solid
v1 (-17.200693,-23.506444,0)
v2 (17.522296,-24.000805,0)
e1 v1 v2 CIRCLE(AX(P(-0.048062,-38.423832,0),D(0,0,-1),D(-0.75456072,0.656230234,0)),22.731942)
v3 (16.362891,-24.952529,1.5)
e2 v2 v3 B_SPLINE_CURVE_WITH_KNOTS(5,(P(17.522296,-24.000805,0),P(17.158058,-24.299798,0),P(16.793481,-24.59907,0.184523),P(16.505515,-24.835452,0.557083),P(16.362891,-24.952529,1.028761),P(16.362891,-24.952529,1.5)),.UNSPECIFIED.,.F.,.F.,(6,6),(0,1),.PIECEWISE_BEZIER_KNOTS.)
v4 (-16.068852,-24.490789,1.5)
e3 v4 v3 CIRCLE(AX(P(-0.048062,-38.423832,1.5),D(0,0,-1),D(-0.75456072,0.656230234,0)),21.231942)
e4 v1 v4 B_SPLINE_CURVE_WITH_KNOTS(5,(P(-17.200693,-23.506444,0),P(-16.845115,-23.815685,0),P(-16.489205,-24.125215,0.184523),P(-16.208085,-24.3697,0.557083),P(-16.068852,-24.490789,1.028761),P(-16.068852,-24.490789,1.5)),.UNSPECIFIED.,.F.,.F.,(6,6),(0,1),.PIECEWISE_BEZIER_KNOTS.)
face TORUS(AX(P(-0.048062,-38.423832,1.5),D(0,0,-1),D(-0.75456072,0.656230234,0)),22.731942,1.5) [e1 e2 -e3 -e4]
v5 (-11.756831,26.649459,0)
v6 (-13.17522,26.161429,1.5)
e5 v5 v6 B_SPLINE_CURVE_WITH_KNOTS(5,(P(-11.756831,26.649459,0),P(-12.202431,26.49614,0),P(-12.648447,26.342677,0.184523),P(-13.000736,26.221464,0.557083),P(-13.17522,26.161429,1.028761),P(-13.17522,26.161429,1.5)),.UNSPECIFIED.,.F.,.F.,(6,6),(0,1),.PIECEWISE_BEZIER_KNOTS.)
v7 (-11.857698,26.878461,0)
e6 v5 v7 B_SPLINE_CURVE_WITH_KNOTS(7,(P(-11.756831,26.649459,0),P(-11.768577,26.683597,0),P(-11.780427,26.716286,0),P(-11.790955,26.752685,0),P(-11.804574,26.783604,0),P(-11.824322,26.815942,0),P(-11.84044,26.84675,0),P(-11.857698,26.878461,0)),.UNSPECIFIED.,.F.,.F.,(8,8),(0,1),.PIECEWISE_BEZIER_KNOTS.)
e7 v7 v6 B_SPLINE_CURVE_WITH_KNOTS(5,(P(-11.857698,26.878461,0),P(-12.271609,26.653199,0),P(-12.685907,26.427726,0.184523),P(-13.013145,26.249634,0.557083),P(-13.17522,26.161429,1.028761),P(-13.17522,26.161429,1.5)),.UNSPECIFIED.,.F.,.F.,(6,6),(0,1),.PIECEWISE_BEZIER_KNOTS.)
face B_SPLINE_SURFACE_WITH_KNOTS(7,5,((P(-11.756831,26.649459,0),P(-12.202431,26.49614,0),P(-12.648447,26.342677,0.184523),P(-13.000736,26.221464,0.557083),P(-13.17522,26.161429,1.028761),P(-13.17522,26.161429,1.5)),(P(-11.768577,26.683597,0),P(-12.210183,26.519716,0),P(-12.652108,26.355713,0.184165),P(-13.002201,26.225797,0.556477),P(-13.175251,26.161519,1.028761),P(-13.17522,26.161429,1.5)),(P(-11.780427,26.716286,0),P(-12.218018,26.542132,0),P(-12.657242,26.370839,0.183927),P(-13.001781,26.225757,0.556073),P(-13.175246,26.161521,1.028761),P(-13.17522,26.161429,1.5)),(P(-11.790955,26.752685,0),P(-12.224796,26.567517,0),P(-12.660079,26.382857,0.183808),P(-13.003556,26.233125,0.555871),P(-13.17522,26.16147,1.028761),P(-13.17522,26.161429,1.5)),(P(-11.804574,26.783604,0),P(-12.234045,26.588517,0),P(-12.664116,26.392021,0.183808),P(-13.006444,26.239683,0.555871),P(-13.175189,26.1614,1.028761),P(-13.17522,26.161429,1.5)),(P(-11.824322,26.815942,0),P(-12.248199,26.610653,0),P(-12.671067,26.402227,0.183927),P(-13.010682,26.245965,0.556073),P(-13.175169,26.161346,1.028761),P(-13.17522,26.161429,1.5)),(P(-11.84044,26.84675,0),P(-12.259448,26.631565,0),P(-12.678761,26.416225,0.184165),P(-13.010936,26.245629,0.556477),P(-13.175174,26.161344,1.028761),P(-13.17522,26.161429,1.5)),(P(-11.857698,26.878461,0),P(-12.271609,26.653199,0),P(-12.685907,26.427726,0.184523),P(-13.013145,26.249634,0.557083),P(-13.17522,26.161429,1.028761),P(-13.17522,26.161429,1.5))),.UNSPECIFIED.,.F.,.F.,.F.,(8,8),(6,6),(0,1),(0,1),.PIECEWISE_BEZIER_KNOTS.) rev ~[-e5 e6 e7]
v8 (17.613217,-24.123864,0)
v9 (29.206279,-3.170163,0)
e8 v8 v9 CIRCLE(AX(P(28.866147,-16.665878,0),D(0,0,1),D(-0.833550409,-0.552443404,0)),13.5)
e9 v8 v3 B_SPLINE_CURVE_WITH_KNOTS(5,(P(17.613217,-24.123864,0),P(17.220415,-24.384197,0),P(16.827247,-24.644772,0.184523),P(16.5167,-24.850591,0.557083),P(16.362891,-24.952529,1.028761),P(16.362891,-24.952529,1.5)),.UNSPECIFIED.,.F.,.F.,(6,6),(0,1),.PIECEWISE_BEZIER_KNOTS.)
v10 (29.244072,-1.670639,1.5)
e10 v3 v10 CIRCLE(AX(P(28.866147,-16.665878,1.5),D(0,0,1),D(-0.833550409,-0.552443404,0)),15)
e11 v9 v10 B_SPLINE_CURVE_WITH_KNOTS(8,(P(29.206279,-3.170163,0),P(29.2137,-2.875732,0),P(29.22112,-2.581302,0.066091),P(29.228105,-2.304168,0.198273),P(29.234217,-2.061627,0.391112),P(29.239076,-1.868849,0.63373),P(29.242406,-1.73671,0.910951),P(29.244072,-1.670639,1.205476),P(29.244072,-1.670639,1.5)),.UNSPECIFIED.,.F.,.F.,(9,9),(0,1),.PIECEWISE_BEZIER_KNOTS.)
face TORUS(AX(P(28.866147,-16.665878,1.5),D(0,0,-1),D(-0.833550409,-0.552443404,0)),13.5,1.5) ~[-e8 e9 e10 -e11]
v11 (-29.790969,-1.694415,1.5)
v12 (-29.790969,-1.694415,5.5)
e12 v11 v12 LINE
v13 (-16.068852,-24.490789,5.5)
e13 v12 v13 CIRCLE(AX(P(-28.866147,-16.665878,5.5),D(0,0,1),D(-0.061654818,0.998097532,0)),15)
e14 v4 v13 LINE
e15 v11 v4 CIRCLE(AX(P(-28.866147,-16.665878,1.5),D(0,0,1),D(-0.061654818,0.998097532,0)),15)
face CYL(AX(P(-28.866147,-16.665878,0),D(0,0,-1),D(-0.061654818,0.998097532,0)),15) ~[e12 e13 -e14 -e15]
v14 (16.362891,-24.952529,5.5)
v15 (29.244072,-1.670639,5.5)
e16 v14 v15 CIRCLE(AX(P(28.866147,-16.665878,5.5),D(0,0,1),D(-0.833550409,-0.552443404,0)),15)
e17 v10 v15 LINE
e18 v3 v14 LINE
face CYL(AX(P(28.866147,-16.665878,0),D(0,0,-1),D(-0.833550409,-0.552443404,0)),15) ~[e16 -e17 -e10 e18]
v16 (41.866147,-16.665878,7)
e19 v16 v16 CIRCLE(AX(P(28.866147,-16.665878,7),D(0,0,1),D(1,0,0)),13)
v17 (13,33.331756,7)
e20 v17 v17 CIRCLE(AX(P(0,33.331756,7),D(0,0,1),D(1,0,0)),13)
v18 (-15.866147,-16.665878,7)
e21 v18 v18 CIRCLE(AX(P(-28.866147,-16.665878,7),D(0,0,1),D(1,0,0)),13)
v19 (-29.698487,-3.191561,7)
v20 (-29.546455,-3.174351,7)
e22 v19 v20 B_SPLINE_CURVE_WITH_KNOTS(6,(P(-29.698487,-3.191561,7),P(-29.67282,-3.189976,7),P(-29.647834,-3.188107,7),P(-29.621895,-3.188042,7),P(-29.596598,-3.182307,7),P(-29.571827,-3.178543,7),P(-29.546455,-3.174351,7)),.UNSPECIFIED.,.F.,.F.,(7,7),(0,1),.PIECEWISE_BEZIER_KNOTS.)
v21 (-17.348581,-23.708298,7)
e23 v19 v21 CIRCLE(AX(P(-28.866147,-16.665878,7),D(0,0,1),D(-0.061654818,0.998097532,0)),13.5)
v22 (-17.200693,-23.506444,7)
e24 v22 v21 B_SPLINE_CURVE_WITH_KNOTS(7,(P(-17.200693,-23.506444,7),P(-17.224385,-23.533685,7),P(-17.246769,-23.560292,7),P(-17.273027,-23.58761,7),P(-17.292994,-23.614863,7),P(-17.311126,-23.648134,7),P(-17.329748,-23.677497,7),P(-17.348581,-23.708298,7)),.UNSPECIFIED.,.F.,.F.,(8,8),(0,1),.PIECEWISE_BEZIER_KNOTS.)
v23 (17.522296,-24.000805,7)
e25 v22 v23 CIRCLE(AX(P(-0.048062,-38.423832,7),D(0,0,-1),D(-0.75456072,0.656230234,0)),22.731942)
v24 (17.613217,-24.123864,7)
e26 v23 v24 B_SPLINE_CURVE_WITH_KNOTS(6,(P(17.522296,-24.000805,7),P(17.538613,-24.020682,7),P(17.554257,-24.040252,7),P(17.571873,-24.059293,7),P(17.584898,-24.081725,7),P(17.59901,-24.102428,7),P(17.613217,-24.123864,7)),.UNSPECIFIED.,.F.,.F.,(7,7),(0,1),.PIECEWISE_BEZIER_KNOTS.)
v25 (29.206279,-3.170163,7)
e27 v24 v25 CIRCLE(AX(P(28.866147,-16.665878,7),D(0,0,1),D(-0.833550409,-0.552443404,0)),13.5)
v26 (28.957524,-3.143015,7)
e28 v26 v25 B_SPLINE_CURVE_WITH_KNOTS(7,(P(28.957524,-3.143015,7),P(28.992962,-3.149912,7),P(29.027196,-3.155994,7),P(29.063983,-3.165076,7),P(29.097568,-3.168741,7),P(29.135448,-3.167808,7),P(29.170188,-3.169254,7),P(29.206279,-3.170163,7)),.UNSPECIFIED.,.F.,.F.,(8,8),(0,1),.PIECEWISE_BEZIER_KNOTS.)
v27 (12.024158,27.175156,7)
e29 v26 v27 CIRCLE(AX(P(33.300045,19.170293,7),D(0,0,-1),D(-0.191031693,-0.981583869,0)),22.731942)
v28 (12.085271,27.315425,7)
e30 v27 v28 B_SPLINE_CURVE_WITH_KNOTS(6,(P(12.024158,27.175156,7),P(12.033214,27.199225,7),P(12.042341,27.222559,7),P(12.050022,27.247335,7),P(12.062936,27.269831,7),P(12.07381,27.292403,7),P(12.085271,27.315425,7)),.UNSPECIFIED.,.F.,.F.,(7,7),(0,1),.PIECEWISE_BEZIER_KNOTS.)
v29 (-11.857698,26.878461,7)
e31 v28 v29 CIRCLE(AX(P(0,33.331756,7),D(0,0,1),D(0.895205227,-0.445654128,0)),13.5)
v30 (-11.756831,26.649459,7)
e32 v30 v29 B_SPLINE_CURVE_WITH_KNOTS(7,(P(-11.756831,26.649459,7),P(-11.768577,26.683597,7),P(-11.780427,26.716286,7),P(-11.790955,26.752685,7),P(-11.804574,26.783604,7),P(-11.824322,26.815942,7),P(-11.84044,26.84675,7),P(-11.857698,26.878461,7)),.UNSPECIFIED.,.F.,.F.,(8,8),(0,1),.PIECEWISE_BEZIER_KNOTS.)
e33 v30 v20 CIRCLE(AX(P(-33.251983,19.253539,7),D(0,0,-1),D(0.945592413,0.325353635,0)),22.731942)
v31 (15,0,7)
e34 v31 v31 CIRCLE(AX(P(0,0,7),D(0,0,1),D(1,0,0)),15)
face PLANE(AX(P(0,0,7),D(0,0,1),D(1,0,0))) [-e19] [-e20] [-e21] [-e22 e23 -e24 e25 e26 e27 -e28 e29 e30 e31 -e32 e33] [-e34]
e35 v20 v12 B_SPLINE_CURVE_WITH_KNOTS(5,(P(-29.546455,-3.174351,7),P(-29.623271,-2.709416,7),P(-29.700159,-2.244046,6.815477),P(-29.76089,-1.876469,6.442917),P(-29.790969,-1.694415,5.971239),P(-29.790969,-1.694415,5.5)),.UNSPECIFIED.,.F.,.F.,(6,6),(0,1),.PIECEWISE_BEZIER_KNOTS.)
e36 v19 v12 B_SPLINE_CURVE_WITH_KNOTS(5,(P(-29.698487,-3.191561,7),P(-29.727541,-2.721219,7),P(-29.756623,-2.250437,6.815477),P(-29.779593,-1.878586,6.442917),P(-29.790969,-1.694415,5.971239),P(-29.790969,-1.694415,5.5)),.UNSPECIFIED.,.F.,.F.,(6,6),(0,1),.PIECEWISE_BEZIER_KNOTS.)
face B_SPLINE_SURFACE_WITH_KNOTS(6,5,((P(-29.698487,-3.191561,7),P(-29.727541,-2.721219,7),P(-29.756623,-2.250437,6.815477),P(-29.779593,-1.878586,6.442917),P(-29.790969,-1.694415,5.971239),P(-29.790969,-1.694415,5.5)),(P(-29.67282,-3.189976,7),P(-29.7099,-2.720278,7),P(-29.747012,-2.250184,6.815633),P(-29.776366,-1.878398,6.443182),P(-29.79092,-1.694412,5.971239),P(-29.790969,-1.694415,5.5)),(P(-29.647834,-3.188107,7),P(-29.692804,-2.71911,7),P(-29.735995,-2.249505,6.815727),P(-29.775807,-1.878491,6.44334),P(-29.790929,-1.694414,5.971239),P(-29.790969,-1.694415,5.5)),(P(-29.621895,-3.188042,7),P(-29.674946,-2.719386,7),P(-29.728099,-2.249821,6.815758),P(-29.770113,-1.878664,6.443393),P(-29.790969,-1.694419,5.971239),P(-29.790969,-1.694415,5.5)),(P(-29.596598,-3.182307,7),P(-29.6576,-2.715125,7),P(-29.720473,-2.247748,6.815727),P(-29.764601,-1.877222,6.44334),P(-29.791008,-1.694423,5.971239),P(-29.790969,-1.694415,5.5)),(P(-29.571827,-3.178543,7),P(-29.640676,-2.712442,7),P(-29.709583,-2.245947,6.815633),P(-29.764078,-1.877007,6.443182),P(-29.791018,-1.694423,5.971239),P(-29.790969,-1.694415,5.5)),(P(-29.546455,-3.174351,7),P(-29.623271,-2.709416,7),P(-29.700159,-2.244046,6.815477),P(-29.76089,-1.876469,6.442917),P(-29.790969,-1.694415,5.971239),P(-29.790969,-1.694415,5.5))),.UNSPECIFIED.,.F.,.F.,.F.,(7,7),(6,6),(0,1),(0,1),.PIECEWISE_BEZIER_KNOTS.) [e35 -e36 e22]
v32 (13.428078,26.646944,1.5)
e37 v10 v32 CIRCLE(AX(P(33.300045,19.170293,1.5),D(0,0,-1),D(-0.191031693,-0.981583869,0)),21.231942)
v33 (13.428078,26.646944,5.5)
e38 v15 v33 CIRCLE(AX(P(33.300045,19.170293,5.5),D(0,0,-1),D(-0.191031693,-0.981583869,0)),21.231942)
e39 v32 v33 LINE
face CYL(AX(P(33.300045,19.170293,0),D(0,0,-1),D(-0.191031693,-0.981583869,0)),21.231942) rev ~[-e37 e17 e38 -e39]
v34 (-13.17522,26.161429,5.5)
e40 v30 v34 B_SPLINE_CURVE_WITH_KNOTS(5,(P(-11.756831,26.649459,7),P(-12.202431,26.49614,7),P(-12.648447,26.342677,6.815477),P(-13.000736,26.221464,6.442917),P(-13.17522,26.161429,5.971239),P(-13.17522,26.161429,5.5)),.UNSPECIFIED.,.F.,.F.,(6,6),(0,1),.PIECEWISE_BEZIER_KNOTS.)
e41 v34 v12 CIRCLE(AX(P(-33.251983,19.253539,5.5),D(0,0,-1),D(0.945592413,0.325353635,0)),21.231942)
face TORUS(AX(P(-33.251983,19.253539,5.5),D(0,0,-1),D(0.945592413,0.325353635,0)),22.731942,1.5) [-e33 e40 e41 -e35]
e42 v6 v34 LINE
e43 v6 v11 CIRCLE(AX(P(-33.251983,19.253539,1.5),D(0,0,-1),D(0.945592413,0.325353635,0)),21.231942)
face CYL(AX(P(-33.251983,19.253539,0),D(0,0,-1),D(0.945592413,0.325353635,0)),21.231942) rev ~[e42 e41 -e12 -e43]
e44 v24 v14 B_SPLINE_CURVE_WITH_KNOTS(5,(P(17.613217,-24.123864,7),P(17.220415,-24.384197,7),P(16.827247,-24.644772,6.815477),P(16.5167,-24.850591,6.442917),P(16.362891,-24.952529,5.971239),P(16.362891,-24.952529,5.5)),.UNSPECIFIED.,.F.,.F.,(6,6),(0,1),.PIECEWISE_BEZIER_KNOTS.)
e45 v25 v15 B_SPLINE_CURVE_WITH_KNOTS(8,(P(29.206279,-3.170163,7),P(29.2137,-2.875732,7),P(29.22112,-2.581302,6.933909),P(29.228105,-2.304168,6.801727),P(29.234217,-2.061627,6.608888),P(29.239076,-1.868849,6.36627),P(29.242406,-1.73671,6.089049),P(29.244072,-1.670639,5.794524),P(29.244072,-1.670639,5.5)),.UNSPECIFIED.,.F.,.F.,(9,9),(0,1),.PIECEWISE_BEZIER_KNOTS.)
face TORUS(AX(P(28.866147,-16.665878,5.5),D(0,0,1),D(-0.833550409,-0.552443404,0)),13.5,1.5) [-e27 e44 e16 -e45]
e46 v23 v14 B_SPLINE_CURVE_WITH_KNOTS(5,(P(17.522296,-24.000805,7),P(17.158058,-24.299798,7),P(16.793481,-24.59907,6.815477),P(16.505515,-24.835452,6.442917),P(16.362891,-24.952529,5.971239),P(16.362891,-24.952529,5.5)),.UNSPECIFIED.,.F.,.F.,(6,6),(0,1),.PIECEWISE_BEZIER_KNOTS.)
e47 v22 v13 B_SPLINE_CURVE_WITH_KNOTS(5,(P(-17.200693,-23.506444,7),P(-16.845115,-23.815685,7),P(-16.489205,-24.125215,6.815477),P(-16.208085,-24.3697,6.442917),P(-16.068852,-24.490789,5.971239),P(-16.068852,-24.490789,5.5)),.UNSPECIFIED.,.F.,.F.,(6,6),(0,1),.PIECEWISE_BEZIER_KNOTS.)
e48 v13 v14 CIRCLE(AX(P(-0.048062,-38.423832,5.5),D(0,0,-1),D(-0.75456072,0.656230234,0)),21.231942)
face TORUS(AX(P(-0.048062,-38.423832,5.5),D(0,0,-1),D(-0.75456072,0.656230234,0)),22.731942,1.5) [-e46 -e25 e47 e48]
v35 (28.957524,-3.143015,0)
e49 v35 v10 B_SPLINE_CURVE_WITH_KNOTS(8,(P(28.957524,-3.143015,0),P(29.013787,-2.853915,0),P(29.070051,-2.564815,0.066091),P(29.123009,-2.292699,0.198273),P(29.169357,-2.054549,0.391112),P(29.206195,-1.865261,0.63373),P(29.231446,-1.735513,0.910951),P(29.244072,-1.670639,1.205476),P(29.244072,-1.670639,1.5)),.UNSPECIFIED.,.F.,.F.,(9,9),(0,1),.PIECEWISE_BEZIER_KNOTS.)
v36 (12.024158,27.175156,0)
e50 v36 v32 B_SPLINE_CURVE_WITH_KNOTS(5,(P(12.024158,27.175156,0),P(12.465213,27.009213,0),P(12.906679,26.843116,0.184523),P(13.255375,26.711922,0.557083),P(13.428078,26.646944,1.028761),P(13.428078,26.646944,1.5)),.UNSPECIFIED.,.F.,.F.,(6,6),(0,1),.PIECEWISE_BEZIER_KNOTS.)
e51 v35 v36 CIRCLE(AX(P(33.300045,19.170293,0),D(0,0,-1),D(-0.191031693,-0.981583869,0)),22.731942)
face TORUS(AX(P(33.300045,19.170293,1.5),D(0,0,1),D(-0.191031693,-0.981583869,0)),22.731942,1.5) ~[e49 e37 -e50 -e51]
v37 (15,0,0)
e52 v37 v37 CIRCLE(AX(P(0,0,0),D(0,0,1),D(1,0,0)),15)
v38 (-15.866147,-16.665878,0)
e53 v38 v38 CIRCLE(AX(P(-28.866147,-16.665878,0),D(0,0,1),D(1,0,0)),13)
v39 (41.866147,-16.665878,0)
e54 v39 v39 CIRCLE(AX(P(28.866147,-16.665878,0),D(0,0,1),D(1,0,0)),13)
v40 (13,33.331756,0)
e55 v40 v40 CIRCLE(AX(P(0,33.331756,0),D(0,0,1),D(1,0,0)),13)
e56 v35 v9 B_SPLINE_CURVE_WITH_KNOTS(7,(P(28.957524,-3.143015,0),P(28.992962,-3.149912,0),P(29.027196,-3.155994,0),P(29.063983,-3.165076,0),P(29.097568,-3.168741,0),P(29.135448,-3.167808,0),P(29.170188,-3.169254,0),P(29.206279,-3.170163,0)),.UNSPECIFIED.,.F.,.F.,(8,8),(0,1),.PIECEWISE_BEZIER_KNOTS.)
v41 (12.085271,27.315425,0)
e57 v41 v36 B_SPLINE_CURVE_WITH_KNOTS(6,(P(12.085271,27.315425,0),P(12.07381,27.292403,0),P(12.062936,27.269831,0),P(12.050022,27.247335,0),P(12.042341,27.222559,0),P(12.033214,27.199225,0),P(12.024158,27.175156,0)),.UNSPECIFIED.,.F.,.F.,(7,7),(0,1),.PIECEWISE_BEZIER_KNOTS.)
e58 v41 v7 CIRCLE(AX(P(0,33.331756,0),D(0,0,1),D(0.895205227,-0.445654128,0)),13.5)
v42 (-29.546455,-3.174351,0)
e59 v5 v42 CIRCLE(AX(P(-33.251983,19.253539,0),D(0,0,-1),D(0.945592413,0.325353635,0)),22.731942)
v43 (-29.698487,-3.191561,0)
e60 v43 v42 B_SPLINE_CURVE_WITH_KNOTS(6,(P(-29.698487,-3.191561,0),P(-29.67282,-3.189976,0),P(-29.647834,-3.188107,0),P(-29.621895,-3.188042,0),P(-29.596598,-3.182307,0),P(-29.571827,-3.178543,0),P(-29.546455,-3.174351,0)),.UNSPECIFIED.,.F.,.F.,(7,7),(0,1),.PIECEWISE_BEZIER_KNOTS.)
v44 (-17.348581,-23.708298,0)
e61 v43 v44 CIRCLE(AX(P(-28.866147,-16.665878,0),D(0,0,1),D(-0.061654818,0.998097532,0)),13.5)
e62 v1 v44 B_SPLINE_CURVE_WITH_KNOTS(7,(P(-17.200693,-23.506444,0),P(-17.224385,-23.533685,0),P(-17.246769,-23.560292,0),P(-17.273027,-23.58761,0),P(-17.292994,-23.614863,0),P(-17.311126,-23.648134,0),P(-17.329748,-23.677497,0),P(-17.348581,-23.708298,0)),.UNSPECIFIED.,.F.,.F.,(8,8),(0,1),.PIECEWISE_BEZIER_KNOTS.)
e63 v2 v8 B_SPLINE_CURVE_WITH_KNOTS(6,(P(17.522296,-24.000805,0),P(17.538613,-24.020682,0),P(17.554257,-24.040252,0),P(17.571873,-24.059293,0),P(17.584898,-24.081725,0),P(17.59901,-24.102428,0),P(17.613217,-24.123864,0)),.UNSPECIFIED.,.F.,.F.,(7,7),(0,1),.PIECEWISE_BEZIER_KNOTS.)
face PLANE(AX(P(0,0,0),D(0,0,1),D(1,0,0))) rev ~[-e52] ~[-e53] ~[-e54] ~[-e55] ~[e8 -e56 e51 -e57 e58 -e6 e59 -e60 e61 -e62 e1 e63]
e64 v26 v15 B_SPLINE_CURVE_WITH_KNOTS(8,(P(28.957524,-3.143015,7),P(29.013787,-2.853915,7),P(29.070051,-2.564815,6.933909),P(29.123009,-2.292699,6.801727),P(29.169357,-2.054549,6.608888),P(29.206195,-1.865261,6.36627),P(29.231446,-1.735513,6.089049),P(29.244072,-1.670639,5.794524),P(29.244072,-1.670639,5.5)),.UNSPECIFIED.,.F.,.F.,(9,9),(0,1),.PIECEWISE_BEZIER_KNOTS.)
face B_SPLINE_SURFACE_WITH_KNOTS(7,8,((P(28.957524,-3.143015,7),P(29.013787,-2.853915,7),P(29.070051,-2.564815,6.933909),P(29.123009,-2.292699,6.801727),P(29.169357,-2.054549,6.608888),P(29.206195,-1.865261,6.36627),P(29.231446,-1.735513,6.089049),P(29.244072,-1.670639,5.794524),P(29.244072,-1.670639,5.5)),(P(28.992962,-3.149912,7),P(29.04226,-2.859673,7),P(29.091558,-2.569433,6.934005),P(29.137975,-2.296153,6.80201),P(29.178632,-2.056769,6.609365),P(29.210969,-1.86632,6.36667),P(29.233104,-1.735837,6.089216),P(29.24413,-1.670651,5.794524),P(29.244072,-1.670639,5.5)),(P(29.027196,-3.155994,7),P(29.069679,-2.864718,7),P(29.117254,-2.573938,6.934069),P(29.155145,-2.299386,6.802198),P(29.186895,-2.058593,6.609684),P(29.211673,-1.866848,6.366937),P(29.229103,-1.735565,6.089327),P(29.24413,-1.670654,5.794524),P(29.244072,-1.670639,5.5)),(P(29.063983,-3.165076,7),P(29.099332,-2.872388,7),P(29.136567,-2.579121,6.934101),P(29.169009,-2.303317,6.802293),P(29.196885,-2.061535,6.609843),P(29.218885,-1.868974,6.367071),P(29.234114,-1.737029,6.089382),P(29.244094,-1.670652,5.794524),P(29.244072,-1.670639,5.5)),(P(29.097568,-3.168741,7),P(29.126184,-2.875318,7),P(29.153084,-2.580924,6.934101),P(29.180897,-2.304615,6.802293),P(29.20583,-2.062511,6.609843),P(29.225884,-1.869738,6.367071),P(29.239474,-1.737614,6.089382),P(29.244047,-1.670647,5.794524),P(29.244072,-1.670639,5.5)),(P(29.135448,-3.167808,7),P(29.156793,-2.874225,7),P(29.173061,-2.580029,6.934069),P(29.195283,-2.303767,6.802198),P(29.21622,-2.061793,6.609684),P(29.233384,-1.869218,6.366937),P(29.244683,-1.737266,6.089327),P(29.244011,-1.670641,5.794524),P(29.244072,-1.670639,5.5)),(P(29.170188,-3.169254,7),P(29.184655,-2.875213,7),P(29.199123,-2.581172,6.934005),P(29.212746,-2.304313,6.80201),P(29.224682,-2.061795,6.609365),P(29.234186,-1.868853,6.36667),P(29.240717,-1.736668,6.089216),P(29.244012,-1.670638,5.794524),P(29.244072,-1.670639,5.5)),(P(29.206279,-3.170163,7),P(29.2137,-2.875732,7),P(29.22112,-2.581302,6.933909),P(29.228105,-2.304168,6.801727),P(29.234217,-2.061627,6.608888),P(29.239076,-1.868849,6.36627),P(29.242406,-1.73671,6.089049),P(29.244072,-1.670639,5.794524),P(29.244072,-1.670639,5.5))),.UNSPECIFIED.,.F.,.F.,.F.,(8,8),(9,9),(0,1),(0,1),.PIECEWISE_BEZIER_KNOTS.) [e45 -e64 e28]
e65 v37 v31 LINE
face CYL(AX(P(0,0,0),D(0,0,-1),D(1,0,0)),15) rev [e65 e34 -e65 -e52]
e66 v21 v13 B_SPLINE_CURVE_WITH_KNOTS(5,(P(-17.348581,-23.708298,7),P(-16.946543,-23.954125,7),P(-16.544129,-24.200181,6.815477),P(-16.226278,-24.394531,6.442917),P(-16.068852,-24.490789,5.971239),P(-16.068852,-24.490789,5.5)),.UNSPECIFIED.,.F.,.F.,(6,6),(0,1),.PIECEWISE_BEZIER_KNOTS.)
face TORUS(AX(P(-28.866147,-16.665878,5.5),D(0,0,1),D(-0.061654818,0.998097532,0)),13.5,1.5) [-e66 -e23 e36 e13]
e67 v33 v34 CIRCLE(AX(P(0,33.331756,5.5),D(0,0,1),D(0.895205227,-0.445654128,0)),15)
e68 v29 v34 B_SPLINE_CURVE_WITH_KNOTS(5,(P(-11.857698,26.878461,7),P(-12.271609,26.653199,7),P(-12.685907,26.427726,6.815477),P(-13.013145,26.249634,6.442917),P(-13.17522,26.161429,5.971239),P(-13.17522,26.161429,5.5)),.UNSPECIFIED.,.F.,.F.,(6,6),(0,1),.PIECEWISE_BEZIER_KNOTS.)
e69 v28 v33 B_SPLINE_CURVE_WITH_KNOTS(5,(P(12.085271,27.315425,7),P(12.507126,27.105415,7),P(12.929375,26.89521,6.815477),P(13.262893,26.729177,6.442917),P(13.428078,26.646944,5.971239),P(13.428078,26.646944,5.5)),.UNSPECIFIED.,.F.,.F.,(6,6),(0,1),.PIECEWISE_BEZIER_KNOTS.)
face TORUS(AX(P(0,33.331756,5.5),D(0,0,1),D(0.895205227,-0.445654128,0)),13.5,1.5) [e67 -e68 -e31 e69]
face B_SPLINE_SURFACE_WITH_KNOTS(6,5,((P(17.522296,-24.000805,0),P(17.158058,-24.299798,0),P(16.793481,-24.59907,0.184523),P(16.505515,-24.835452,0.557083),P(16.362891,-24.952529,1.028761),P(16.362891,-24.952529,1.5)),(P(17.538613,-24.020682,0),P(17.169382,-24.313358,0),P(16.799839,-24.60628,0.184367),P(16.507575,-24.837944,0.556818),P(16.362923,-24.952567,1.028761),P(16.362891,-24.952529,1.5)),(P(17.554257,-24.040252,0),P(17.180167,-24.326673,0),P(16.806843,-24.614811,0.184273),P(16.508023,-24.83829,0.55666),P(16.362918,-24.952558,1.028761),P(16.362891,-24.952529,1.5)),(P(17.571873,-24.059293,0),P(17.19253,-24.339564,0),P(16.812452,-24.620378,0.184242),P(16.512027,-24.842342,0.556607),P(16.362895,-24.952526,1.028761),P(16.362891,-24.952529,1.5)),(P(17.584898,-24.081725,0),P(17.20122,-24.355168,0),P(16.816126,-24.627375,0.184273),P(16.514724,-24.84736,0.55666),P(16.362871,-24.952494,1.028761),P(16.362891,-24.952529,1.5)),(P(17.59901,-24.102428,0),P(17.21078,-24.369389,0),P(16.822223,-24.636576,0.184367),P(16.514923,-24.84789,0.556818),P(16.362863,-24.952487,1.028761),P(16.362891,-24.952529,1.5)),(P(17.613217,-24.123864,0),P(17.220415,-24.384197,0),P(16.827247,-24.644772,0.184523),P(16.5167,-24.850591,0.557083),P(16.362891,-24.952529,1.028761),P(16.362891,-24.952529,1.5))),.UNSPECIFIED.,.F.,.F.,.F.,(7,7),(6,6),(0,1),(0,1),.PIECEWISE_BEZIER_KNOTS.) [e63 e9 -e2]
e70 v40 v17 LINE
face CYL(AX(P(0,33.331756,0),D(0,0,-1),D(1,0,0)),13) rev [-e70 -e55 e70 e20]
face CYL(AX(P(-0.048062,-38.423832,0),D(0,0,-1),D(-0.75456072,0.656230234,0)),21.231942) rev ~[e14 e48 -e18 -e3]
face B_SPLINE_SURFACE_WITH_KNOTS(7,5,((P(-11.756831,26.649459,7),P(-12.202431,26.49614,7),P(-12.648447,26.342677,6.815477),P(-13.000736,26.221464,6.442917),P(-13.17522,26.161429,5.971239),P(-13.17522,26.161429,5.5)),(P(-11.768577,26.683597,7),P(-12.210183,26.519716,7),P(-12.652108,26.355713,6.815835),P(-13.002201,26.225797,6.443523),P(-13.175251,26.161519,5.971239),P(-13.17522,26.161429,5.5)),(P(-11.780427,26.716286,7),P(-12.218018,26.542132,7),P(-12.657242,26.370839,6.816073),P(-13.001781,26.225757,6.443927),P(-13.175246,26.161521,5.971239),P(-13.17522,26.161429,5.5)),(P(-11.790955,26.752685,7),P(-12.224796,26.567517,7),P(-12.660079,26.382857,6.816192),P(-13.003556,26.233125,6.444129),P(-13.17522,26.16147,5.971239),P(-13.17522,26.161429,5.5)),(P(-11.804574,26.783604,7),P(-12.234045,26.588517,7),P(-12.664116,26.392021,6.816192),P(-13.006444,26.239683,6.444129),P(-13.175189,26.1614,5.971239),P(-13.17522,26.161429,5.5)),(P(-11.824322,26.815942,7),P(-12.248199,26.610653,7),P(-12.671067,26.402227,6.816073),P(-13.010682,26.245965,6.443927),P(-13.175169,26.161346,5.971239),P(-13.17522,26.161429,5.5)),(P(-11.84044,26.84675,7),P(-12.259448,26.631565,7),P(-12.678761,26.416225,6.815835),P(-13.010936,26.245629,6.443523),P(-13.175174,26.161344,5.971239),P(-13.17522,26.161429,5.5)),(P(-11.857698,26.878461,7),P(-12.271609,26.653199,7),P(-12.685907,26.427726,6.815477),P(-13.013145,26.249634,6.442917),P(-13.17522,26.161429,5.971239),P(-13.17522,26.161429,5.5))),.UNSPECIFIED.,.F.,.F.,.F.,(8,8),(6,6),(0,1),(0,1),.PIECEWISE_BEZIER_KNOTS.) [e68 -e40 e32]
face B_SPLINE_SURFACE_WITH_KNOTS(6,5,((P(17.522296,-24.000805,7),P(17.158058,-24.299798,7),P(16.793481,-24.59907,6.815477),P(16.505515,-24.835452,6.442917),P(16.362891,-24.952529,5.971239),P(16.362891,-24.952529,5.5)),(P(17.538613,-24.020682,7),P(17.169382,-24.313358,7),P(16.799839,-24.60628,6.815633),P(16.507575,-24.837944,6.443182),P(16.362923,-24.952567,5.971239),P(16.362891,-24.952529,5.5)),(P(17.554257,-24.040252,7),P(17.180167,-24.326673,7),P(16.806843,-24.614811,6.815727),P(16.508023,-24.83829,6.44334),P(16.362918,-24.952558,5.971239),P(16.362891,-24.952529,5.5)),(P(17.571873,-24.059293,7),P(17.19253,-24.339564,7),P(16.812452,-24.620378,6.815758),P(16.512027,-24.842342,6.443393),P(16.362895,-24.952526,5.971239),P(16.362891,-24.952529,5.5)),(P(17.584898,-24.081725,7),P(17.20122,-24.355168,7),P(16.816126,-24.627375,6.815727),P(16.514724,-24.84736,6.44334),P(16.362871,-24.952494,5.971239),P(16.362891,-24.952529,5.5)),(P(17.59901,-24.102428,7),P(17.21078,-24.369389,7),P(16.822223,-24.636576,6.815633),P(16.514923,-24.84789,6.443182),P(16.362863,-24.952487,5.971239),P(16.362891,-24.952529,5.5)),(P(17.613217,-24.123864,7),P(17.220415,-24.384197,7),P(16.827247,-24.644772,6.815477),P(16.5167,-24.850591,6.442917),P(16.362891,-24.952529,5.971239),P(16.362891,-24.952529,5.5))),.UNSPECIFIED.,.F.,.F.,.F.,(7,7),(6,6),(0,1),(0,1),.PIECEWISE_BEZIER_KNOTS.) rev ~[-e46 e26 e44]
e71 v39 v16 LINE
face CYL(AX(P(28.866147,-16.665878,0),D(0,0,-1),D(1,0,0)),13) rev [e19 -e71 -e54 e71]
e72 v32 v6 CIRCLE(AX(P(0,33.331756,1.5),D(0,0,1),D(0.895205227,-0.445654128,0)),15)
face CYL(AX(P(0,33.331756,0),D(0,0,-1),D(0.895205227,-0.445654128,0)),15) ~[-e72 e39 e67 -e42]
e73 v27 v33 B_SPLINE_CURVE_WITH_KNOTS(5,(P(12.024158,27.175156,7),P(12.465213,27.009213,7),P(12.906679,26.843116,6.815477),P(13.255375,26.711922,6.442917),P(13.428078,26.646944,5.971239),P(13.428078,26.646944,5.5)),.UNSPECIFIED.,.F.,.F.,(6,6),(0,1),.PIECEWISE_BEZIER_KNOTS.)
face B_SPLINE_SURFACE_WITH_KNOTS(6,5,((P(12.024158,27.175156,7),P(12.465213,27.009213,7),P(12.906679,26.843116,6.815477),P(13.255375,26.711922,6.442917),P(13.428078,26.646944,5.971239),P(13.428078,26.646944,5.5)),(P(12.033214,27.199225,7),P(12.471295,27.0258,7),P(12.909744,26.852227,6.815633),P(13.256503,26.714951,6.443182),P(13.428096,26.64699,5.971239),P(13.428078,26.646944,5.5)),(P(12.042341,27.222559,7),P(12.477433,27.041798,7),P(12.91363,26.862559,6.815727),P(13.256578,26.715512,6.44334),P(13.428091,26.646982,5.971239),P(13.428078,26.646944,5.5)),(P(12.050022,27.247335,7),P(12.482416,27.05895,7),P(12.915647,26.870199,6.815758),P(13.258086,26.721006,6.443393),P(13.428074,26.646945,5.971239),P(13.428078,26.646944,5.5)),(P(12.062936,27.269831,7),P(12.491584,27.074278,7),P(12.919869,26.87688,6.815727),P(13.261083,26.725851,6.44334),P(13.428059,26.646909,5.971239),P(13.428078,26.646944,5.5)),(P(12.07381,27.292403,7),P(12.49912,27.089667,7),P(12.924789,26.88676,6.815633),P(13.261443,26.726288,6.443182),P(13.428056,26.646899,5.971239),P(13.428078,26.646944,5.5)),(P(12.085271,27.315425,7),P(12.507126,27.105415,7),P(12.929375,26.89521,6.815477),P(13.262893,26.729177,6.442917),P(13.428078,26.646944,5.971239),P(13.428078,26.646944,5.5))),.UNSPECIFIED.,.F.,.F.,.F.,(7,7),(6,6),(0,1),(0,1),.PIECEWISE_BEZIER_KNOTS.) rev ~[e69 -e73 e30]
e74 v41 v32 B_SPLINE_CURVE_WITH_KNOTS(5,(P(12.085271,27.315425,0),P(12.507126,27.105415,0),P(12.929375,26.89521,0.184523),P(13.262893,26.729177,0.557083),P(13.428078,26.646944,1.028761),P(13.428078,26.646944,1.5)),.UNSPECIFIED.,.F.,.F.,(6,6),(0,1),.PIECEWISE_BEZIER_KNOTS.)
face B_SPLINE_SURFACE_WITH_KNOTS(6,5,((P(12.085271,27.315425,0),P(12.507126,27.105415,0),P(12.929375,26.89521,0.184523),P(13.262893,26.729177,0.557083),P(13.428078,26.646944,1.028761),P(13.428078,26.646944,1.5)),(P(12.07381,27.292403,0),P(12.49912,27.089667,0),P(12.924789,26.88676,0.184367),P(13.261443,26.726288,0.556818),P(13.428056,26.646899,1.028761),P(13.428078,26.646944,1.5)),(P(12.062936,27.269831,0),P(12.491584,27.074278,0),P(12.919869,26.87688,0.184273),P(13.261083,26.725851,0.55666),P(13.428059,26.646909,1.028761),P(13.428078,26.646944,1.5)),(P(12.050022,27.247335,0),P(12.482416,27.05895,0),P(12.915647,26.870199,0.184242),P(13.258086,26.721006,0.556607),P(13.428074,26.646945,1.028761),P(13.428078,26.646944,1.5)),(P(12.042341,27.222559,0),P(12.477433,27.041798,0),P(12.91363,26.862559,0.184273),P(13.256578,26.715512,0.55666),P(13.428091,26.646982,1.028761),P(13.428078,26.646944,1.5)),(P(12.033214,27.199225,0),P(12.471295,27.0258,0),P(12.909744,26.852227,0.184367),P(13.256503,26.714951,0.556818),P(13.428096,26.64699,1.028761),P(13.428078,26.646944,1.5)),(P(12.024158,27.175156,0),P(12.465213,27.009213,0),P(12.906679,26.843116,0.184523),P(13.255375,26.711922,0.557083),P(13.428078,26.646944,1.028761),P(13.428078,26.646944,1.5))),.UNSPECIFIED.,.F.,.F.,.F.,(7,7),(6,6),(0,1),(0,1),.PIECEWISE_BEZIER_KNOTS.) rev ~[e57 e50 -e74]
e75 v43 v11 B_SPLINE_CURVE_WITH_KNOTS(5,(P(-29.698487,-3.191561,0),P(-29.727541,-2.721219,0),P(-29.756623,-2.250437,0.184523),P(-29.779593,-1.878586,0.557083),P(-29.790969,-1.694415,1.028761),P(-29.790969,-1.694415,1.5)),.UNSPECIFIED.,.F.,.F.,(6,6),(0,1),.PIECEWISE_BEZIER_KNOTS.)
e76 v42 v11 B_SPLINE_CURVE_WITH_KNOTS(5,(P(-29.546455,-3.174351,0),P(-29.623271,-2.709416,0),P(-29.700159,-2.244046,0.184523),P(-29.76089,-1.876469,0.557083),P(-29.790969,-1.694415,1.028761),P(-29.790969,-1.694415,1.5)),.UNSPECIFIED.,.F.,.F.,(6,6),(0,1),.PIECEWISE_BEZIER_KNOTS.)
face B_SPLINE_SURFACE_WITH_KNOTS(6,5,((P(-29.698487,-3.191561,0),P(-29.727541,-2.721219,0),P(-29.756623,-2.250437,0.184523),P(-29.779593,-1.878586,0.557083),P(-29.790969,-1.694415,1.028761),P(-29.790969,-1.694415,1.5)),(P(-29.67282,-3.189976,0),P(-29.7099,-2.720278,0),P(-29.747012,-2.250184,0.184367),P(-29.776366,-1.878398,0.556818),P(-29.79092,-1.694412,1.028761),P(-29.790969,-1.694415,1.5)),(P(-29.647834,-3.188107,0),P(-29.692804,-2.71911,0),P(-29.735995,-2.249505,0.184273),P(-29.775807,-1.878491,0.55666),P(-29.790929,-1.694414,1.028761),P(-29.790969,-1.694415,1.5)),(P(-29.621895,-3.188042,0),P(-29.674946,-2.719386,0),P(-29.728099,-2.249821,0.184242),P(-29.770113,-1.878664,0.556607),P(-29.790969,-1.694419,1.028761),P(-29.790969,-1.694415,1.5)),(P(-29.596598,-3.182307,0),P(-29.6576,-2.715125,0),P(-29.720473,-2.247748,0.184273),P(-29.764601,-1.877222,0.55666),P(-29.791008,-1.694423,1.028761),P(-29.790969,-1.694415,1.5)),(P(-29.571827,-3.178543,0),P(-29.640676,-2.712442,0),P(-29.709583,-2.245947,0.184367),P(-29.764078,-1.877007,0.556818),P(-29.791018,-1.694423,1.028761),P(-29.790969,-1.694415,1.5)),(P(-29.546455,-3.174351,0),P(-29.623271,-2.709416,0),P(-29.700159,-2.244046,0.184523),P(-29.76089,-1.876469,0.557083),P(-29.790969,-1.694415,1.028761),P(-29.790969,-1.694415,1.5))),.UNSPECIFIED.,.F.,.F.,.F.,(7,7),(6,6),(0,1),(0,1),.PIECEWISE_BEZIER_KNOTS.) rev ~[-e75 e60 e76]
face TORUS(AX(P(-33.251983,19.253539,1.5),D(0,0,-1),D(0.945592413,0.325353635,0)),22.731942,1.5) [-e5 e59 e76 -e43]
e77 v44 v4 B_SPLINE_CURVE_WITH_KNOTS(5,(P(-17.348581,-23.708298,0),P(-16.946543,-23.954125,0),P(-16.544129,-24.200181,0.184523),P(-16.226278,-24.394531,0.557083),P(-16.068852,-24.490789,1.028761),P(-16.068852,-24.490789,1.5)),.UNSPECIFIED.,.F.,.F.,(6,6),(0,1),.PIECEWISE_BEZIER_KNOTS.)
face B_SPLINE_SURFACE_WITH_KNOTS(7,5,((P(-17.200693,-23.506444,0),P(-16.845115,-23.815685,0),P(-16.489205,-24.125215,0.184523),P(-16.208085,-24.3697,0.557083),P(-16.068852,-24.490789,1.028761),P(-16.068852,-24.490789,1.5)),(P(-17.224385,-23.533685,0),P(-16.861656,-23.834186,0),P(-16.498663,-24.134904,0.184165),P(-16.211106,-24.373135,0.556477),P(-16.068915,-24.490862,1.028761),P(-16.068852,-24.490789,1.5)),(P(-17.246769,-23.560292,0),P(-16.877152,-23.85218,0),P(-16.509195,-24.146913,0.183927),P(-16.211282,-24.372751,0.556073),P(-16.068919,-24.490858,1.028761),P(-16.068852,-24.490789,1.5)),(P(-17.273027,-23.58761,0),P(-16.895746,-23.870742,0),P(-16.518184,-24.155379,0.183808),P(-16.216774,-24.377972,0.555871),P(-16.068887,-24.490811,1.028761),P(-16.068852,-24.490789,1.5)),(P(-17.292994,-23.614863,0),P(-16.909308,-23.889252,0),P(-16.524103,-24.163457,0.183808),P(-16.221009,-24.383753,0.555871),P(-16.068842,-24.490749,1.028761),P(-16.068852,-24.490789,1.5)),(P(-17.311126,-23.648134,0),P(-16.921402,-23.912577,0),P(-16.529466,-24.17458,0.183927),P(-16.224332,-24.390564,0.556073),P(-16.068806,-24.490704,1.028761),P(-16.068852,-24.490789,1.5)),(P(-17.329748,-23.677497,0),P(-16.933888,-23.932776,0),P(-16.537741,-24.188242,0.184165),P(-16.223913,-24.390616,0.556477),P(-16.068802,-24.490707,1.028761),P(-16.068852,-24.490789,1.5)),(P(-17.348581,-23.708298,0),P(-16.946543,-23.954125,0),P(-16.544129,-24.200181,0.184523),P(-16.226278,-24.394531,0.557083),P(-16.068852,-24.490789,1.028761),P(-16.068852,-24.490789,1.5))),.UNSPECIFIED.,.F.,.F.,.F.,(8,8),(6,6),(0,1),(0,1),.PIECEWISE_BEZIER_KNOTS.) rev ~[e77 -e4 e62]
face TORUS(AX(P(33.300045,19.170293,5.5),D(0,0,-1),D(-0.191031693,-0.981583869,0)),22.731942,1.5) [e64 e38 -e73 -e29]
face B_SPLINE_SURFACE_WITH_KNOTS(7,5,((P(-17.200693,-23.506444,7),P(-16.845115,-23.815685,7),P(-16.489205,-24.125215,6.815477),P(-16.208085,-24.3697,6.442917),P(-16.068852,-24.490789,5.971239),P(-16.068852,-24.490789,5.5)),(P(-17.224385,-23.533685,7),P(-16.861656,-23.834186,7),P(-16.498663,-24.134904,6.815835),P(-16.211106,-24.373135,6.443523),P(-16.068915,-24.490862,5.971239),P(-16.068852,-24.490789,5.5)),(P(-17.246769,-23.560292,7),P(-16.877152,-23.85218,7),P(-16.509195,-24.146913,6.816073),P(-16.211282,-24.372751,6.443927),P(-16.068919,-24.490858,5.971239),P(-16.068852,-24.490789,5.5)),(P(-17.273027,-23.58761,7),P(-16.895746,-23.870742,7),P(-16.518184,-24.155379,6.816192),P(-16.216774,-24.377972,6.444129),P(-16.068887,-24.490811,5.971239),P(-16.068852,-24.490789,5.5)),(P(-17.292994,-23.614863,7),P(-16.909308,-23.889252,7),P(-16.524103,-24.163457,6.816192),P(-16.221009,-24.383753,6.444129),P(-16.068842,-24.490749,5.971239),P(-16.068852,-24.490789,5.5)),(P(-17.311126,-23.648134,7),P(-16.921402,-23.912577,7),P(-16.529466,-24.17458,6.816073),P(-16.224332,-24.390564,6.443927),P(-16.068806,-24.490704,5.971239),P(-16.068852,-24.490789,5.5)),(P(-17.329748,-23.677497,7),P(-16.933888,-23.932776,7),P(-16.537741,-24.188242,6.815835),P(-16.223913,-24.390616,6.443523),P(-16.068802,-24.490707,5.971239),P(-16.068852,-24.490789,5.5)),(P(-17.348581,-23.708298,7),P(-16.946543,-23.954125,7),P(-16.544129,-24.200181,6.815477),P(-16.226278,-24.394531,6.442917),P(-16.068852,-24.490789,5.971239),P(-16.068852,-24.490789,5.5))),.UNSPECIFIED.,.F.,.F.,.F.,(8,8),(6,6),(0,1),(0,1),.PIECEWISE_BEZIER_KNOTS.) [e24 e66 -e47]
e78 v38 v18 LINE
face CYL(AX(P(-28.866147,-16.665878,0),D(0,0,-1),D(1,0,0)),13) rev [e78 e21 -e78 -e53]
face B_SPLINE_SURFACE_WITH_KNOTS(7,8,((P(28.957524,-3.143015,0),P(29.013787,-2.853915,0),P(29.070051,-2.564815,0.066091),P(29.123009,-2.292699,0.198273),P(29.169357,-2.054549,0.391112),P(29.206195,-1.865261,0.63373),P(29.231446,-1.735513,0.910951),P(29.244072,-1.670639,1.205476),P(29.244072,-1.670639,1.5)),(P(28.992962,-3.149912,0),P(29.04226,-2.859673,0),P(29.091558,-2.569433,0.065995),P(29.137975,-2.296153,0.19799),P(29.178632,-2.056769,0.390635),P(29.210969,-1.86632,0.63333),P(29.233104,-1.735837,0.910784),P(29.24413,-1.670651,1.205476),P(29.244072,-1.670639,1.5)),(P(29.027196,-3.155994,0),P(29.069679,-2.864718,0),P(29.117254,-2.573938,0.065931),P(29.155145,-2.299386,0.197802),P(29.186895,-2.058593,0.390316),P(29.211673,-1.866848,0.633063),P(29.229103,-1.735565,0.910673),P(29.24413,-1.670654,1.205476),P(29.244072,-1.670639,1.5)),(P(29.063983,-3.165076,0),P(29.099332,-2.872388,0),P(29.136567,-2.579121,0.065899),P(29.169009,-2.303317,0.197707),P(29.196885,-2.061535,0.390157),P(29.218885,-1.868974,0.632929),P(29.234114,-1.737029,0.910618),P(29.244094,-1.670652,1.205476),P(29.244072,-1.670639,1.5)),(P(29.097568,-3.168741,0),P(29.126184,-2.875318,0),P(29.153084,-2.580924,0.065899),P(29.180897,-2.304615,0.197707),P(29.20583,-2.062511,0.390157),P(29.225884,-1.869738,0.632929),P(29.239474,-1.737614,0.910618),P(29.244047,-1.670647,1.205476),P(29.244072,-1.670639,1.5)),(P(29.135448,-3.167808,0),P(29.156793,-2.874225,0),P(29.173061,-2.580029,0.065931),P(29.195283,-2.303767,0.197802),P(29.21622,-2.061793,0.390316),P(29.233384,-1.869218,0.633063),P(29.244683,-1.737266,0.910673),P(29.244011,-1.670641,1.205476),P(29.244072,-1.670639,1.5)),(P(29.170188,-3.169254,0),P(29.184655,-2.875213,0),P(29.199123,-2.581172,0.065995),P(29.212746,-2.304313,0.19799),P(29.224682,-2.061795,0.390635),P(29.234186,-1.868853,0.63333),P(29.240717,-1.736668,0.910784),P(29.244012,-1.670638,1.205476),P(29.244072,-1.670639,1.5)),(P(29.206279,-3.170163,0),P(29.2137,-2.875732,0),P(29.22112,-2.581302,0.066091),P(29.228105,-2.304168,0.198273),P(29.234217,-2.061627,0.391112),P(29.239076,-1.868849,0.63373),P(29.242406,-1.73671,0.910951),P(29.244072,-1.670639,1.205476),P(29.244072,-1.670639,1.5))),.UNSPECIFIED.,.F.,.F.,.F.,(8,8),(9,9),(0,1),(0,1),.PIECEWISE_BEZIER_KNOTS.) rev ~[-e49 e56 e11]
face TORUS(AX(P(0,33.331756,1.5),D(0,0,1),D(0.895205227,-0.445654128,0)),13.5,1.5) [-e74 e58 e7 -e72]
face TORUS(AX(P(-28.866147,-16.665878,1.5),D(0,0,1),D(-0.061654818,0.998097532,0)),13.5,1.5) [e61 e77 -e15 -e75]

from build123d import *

# Parameters (mm, degrees)
F0_R     = 13
F0_R_2   = 15
F1_DEPTH = 7
F2_R     = 1.5


# Not quite as in the source:
# - a feature names something its author has since deleted; it is built from what else it names


with BuildPart() as f1:
    # F0 (on Top) → F1 (new body)
    with BuildSketch(Plane.XY):
        with BuildLine():
            ThreePointArc((29.2440715105, -1.6706394265), (14.7633799525, 8.8171573496), (13.4280784061, 26.6469436353))
            ThreePointArc((13.4280784061, 26.6469436353), (-0.2737071825, 48.3292581534), (-13.1752195713, 26.1614285514))
            ThreePointArc((-13.1752195713, 26.1614285514), (-15.0175722301, 8.3768834098), (-29.7909693244, -1.6944147939))
            ThreePointArc((-29.7909693244, -1.6944147939), (-41.7175117157, -24.4016664499), (-16.0688519392, -24.4907891249))
            ThreePointArc((-16.0688519392, -24.4907891249), (0.2541922776, -17.1940407594), (16.3628909183, -24.9525288414))
            ThreePointArc((16.3628909183, -24.9525288414), (41.9912188982, -23.9275917035), (29.2440715105, -1.6706394265))
        make_face()
        with Locations((-28.8661470579, -16.6658777744)):
            Circle(F0_R, mode=Mode.SUBTRACT)
        Circle(F0_R_2, mode=Mode.SUBTRACT)
        with Locations((28.8661470579, -16.6658777744)):
            Circle(F0_R, mode=Mode.SUBTRACT)
        with Locations((0, 33.3317555487)):
            Circle(F0_R, mode=Mode.SUBTRACT)
    extrude(amount=F1_DEPTH)

    # F2 (call 1 of 2: OpenCascade refuses the feature's edges together)
    f2_edges = [f1.edges().sort_by_distance(p)[0] for p in [
        (0.254192, -17.194041, 7),
        (-41.717512, -24.401666, 7),
        (-15.017572, 8.376883, 7),
        (14.76338, 8.817157, 7),
        (-0.273707, 48.329258, 7),
        (41.991219, -23.927592, 7),
    ]]
    fillet(f2_edges, radius=F2_R)

    # F2#2 (call 2 of 2)
    f2_2_edges = [f1.edges().sort_by_distance(p)[0] for p in [
        (0.254192, -17.194041, 0),
        (-41.717512, -24.401666, 0),
        (-15.017572, 8.376883, 0),
        (-0.273707, 48.329258, 0),
        (14.76338, 8.817157, 0),
        (41.991219, -23.927592, 0),
    ]]
    fillet(f2_2_edges, radius=F2_R)


solid = f1.part
